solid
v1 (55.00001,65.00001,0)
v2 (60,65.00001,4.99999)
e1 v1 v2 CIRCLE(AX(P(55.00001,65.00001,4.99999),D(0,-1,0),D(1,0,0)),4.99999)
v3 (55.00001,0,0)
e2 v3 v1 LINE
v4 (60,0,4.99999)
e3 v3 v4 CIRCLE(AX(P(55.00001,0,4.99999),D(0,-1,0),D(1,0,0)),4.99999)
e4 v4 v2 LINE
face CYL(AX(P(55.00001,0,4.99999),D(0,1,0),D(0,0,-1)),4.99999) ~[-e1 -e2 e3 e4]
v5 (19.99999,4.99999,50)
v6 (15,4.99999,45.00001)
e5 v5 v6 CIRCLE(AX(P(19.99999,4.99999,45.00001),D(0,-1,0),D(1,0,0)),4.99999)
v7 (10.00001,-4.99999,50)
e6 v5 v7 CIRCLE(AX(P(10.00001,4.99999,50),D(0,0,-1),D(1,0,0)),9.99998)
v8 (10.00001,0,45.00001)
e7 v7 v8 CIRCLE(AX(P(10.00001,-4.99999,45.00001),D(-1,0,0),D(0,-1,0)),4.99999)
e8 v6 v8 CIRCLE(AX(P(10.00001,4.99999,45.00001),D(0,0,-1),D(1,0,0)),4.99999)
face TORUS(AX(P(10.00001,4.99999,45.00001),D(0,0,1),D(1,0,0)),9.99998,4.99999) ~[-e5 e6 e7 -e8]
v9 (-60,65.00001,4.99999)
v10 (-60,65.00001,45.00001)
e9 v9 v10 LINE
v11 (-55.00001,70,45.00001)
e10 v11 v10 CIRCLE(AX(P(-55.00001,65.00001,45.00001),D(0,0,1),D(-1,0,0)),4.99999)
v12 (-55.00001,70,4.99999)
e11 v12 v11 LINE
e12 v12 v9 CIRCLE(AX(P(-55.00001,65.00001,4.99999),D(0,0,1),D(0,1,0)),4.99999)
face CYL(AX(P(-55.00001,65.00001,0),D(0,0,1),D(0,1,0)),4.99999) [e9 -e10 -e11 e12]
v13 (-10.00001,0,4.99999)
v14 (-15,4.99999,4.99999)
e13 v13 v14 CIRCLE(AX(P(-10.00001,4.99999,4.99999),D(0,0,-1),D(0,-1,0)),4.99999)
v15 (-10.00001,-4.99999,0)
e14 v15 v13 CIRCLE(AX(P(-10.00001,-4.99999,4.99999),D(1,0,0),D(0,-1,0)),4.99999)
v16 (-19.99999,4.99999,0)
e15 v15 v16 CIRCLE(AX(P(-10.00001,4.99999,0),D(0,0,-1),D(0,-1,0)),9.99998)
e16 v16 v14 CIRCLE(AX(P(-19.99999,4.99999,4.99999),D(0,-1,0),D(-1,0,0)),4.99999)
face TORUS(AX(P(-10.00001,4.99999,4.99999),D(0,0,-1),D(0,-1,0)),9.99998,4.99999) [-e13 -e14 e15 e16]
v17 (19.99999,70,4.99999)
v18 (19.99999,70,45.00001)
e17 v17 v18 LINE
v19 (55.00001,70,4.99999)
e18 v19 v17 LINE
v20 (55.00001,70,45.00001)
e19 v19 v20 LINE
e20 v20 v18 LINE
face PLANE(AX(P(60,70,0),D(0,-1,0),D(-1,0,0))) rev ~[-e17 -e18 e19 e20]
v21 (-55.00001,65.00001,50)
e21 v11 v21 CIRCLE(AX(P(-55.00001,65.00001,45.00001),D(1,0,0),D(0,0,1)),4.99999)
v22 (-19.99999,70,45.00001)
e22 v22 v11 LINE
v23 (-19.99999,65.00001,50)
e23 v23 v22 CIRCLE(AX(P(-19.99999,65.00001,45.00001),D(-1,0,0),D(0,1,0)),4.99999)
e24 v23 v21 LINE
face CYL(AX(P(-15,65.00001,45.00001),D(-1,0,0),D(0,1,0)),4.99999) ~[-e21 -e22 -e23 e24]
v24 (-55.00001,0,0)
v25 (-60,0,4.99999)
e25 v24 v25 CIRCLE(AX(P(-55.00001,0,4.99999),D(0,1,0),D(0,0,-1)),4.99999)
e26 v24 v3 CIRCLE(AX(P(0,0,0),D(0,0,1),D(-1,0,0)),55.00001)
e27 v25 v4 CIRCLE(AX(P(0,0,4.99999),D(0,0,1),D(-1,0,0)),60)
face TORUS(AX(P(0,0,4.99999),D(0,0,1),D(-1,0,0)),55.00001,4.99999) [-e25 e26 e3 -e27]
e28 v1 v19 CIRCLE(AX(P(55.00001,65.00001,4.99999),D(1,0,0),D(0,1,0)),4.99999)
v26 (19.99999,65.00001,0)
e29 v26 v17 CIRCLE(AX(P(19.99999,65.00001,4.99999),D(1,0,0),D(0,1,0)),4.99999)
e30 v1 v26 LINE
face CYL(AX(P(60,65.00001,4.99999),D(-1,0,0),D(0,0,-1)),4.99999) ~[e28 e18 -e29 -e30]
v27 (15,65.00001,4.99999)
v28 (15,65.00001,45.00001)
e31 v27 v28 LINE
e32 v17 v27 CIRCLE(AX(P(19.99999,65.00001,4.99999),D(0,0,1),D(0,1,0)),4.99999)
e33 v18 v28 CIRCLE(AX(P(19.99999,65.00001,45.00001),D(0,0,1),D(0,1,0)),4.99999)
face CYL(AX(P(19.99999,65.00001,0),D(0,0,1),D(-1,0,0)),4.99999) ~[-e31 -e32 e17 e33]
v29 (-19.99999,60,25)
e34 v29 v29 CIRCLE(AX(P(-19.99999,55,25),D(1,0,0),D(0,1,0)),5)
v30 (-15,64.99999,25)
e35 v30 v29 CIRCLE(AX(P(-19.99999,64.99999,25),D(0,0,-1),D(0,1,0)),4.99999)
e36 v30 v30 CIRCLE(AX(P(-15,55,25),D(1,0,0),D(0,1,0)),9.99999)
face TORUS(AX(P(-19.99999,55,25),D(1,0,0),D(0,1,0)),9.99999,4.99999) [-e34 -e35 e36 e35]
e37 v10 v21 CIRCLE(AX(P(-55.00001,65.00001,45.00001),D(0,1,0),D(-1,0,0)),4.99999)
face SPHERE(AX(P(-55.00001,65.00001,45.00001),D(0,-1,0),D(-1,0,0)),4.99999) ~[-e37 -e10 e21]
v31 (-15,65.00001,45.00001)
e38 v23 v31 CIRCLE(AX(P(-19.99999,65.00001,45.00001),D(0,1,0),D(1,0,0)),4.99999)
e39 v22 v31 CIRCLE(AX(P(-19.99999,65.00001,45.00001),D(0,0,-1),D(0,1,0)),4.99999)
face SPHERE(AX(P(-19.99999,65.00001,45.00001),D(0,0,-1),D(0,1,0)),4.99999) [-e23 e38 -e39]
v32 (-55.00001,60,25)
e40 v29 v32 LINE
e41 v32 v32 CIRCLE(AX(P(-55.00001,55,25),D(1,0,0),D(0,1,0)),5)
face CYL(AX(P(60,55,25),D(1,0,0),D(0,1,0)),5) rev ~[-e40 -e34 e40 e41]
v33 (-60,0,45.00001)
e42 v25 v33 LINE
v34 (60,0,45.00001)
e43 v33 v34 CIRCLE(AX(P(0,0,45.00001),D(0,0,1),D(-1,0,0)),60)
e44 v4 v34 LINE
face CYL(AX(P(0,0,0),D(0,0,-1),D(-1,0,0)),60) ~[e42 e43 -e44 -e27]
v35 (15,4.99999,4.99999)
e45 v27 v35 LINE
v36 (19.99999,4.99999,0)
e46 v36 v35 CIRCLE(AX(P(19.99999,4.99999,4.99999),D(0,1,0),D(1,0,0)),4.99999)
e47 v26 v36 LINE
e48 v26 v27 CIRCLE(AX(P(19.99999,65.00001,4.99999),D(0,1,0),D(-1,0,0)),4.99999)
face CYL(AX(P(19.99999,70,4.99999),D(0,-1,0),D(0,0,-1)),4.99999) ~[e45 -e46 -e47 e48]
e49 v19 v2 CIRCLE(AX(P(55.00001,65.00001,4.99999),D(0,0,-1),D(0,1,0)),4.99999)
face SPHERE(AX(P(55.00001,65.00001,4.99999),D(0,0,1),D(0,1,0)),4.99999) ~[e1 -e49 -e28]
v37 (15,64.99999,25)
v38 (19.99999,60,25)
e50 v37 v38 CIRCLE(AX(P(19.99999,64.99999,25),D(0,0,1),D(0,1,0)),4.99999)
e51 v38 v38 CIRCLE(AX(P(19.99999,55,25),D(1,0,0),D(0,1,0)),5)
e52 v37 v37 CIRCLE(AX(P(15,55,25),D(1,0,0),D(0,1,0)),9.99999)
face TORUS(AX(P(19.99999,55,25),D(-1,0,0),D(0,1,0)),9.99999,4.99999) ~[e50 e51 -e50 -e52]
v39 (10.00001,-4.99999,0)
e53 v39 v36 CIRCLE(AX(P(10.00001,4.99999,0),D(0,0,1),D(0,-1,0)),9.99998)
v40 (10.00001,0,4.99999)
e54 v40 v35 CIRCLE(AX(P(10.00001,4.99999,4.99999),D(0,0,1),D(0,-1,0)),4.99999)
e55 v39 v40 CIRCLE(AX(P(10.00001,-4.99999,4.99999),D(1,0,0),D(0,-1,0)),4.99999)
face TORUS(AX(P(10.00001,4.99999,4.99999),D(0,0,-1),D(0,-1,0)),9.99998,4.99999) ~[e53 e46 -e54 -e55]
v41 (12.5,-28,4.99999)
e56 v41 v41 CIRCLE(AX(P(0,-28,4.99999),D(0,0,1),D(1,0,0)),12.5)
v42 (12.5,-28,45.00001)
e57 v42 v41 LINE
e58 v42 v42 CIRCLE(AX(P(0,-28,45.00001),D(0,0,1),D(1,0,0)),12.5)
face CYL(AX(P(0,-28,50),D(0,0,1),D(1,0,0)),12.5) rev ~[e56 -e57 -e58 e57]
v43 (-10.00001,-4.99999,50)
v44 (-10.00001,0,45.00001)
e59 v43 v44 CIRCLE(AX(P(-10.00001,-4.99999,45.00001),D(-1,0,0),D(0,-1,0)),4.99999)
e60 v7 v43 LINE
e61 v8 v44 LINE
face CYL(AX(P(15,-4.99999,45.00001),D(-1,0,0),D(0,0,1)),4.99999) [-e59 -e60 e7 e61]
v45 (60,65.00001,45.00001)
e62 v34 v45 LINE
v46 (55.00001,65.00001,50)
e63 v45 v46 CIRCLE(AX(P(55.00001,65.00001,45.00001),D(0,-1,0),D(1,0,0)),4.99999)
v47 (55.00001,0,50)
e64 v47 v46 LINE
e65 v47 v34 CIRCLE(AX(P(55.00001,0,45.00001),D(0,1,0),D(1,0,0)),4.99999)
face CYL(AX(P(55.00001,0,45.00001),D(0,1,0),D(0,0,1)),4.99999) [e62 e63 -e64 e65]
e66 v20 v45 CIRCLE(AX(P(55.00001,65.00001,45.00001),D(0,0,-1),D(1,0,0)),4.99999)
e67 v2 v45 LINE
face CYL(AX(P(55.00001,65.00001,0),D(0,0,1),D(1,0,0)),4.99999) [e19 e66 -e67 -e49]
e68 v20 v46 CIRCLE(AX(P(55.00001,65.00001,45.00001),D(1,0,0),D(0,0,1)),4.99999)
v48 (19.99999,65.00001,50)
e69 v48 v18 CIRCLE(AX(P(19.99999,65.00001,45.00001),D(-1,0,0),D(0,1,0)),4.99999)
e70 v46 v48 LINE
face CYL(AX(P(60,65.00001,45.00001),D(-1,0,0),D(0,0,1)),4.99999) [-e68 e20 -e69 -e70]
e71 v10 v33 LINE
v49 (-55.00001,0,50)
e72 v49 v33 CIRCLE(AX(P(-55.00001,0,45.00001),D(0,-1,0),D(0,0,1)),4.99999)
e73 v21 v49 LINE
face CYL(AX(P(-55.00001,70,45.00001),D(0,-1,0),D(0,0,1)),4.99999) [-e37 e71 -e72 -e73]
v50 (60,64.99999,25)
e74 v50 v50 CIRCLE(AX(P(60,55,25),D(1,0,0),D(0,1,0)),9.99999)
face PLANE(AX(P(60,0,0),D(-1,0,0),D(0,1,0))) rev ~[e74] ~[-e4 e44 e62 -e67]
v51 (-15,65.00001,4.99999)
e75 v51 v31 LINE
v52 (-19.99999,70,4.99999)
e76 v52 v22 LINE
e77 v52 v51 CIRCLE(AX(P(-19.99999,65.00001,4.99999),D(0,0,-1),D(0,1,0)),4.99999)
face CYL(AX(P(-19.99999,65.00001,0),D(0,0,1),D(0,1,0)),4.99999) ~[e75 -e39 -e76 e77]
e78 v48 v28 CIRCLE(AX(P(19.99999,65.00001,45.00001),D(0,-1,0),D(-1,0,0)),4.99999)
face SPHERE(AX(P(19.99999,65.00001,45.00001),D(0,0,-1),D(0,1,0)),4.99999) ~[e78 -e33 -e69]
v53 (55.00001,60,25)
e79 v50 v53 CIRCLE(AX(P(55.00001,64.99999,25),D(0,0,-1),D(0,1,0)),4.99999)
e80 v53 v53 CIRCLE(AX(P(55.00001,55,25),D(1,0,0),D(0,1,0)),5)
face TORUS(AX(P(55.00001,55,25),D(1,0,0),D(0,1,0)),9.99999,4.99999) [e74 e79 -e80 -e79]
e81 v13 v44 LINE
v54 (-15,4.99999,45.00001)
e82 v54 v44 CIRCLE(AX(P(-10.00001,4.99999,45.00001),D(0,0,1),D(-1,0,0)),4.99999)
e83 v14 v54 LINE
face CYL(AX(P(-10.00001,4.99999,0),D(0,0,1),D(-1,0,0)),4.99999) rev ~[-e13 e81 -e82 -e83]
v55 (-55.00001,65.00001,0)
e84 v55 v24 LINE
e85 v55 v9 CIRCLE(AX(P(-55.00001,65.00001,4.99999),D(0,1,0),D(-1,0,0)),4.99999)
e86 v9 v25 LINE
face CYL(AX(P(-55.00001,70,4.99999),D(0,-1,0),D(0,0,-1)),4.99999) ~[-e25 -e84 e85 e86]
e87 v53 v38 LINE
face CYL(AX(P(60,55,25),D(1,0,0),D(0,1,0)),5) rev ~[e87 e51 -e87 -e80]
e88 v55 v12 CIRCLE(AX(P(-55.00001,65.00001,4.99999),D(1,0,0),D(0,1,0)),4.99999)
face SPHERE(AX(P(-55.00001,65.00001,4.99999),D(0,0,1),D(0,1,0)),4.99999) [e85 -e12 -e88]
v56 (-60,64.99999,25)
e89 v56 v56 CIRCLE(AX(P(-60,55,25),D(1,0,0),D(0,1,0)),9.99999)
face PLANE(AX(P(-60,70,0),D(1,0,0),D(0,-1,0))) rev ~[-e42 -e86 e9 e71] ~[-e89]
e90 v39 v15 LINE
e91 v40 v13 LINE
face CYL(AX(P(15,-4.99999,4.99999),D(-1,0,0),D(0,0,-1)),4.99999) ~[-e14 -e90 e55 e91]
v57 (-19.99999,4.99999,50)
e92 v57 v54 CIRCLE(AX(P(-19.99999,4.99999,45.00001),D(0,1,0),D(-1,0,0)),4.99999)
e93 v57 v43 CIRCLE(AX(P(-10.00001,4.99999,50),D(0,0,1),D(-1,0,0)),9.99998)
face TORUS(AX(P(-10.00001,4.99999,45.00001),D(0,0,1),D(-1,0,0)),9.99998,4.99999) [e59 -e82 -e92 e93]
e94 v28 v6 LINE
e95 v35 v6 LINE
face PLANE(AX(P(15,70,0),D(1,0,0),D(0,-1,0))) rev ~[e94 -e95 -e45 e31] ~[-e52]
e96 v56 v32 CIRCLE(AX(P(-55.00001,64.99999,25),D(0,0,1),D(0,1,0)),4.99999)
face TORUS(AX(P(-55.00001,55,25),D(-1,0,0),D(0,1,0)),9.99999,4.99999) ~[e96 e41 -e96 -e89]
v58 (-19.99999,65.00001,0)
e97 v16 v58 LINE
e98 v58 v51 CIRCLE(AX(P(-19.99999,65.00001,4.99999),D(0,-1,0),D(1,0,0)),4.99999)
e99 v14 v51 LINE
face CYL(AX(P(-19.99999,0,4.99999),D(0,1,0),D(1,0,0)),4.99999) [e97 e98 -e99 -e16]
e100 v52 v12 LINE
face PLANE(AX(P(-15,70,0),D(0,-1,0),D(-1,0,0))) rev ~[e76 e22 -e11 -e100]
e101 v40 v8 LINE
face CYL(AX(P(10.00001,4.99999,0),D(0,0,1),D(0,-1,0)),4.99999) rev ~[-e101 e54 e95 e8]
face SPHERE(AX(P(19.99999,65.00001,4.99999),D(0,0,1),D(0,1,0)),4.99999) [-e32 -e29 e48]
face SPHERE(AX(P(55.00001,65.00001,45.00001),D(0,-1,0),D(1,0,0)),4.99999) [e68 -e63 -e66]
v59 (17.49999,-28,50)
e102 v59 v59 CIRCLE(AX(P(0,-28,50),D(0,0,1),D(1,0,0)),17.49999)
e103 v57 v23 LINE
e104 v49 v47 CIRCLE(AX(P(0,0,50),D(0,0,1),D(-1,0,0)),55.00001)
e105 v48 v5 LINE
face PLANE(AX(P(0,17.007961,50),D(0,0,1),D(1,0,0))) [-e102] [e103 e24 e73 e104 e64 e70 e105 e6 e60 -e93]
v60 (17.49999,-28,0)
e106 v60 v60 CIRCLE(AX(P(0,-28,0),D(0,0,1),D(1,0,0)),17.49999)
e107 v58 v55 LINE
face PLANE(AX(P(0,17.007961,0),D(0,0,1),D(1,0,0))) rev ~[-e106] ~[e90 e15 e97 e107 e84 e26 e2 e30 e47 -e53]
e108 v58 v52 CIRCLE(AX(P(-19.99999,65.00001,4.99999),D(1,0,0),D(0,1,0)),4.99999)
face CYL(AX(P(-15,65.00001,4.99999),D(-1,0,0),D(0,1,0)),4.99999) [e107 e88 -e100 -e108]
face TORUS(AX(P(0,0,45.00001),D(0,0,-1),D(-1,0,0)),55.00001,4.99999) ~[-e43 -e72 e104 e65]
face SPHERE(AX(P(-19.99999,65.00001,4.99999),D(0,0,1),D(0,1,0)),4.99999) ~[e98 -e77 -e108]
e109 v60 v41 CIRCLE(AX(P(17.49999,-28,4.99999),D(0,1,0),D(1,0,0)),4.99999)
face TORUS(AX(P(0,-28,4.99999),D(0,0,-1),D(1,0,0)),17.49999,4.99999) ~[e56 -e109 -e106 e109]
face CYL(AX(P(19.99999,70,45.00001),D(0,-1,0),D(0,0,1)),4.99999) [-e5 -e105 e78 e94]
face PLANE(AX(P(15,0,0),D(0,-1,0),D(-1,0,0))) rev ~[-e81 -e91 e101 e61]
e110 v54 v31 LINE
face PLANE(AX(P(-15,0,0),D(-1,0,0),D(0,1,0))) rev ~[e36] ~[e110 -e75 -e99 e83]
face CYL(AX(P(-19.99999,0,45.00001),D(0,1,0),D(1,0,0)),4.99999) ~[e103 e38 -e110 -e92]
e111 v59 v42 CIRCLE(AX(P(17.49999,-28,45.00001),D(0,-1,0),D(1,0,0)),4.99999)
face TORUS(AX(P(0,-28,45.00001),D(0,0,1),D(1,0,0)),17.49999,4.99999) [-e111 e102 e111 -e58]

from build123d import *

# Parameters (mm, degrees)
F1_DEPTH = 50
F2_R     = 12.5
F3_DEPTH = 50.001
F4_R     = 5
F5_DEPTH = 120.001
F6_R     = 4.99999


# Not quite as in the source:
# - a fillet or chamfer is up to 0.001 mm smaller than in the source, because OpenCascade refuses the exact size


with BuildPart() as f1:
    # F0 (on Top) → F1 (new body)
    with BuildSketch(Plane.XY):
        with BuildLine():
            Line((-15, 70), (-60, 70))
            Line((-60, 70), (-60, 0))
            ThreePointArc((-60, 0), (0, -60), (60, 0))
            Line((60, 0), (60, 70))
            Line((60, 70), (15, 70))
            Line((15, 70), (15, 0))
            Line((15, 0), (-15, 0))
            Line((-15, 0), (-15, 70))
        make_face()
    extrude(amount=F1_DEPTH)

    # F2 (on face) → F3 (cut, through all)
    with BuildSketch(Plane.XY.offset(50)):
        with Locations((0, -28)):
            Circle(F2_R)
    extrude(amount=-F3_DEPTH, mode=Mode.SUBTRACT)

    # F4 (on face) → F5 (cut, through all)
    with BuildSketch(Plane.YZ.offset(60)):
        with Locations((55, 25)):
            Circle(F4_R)
    extrude(amount=-F5_DEPTH, mode=Mode.SUBTRACT)

    # F6 (radius 5 in the source; OpenCascade refuses exactly that, so slightly less here)
    f6_edges = [f1.edges().sort_by_distance(p)[0] for p in [
        (-12.5, -28, 50),
        (0, -60, 50),
        (0, 0, 50),
        (15, 0, 25),
        (-15, 0, 25),
        (0, 0, 0),
        (60, 70, 25),
        (15, 70, 25),
        (37.5, 70, 0),
        (37.5, 70, 50),
        (-15, 70, 25),
        (-60, 70, 25),
        (-37.5, 70, 0),
        (-37.5, 70, 50),
        (60, 35, 0),
        (0, -60, 0),
        (-60, 35, 0),
        (15, 35, 0),
        (-15, 35, 0),
        (-12.5, -28, 0),
        (-15, 50, 25),
        (-37.5, 60, 25),
        (-60, 50, 25),
        (60, 50, 25),
        (37.5, 60, 25),
        (15, 50, 25),
        (60, 35, 50),
        (-60, 35, 50),
        (15, 35, 50),
        (-15, 35, 50),
    ]]
    fillet(f6_edges, radius=F6_R)


solid = f1.part
